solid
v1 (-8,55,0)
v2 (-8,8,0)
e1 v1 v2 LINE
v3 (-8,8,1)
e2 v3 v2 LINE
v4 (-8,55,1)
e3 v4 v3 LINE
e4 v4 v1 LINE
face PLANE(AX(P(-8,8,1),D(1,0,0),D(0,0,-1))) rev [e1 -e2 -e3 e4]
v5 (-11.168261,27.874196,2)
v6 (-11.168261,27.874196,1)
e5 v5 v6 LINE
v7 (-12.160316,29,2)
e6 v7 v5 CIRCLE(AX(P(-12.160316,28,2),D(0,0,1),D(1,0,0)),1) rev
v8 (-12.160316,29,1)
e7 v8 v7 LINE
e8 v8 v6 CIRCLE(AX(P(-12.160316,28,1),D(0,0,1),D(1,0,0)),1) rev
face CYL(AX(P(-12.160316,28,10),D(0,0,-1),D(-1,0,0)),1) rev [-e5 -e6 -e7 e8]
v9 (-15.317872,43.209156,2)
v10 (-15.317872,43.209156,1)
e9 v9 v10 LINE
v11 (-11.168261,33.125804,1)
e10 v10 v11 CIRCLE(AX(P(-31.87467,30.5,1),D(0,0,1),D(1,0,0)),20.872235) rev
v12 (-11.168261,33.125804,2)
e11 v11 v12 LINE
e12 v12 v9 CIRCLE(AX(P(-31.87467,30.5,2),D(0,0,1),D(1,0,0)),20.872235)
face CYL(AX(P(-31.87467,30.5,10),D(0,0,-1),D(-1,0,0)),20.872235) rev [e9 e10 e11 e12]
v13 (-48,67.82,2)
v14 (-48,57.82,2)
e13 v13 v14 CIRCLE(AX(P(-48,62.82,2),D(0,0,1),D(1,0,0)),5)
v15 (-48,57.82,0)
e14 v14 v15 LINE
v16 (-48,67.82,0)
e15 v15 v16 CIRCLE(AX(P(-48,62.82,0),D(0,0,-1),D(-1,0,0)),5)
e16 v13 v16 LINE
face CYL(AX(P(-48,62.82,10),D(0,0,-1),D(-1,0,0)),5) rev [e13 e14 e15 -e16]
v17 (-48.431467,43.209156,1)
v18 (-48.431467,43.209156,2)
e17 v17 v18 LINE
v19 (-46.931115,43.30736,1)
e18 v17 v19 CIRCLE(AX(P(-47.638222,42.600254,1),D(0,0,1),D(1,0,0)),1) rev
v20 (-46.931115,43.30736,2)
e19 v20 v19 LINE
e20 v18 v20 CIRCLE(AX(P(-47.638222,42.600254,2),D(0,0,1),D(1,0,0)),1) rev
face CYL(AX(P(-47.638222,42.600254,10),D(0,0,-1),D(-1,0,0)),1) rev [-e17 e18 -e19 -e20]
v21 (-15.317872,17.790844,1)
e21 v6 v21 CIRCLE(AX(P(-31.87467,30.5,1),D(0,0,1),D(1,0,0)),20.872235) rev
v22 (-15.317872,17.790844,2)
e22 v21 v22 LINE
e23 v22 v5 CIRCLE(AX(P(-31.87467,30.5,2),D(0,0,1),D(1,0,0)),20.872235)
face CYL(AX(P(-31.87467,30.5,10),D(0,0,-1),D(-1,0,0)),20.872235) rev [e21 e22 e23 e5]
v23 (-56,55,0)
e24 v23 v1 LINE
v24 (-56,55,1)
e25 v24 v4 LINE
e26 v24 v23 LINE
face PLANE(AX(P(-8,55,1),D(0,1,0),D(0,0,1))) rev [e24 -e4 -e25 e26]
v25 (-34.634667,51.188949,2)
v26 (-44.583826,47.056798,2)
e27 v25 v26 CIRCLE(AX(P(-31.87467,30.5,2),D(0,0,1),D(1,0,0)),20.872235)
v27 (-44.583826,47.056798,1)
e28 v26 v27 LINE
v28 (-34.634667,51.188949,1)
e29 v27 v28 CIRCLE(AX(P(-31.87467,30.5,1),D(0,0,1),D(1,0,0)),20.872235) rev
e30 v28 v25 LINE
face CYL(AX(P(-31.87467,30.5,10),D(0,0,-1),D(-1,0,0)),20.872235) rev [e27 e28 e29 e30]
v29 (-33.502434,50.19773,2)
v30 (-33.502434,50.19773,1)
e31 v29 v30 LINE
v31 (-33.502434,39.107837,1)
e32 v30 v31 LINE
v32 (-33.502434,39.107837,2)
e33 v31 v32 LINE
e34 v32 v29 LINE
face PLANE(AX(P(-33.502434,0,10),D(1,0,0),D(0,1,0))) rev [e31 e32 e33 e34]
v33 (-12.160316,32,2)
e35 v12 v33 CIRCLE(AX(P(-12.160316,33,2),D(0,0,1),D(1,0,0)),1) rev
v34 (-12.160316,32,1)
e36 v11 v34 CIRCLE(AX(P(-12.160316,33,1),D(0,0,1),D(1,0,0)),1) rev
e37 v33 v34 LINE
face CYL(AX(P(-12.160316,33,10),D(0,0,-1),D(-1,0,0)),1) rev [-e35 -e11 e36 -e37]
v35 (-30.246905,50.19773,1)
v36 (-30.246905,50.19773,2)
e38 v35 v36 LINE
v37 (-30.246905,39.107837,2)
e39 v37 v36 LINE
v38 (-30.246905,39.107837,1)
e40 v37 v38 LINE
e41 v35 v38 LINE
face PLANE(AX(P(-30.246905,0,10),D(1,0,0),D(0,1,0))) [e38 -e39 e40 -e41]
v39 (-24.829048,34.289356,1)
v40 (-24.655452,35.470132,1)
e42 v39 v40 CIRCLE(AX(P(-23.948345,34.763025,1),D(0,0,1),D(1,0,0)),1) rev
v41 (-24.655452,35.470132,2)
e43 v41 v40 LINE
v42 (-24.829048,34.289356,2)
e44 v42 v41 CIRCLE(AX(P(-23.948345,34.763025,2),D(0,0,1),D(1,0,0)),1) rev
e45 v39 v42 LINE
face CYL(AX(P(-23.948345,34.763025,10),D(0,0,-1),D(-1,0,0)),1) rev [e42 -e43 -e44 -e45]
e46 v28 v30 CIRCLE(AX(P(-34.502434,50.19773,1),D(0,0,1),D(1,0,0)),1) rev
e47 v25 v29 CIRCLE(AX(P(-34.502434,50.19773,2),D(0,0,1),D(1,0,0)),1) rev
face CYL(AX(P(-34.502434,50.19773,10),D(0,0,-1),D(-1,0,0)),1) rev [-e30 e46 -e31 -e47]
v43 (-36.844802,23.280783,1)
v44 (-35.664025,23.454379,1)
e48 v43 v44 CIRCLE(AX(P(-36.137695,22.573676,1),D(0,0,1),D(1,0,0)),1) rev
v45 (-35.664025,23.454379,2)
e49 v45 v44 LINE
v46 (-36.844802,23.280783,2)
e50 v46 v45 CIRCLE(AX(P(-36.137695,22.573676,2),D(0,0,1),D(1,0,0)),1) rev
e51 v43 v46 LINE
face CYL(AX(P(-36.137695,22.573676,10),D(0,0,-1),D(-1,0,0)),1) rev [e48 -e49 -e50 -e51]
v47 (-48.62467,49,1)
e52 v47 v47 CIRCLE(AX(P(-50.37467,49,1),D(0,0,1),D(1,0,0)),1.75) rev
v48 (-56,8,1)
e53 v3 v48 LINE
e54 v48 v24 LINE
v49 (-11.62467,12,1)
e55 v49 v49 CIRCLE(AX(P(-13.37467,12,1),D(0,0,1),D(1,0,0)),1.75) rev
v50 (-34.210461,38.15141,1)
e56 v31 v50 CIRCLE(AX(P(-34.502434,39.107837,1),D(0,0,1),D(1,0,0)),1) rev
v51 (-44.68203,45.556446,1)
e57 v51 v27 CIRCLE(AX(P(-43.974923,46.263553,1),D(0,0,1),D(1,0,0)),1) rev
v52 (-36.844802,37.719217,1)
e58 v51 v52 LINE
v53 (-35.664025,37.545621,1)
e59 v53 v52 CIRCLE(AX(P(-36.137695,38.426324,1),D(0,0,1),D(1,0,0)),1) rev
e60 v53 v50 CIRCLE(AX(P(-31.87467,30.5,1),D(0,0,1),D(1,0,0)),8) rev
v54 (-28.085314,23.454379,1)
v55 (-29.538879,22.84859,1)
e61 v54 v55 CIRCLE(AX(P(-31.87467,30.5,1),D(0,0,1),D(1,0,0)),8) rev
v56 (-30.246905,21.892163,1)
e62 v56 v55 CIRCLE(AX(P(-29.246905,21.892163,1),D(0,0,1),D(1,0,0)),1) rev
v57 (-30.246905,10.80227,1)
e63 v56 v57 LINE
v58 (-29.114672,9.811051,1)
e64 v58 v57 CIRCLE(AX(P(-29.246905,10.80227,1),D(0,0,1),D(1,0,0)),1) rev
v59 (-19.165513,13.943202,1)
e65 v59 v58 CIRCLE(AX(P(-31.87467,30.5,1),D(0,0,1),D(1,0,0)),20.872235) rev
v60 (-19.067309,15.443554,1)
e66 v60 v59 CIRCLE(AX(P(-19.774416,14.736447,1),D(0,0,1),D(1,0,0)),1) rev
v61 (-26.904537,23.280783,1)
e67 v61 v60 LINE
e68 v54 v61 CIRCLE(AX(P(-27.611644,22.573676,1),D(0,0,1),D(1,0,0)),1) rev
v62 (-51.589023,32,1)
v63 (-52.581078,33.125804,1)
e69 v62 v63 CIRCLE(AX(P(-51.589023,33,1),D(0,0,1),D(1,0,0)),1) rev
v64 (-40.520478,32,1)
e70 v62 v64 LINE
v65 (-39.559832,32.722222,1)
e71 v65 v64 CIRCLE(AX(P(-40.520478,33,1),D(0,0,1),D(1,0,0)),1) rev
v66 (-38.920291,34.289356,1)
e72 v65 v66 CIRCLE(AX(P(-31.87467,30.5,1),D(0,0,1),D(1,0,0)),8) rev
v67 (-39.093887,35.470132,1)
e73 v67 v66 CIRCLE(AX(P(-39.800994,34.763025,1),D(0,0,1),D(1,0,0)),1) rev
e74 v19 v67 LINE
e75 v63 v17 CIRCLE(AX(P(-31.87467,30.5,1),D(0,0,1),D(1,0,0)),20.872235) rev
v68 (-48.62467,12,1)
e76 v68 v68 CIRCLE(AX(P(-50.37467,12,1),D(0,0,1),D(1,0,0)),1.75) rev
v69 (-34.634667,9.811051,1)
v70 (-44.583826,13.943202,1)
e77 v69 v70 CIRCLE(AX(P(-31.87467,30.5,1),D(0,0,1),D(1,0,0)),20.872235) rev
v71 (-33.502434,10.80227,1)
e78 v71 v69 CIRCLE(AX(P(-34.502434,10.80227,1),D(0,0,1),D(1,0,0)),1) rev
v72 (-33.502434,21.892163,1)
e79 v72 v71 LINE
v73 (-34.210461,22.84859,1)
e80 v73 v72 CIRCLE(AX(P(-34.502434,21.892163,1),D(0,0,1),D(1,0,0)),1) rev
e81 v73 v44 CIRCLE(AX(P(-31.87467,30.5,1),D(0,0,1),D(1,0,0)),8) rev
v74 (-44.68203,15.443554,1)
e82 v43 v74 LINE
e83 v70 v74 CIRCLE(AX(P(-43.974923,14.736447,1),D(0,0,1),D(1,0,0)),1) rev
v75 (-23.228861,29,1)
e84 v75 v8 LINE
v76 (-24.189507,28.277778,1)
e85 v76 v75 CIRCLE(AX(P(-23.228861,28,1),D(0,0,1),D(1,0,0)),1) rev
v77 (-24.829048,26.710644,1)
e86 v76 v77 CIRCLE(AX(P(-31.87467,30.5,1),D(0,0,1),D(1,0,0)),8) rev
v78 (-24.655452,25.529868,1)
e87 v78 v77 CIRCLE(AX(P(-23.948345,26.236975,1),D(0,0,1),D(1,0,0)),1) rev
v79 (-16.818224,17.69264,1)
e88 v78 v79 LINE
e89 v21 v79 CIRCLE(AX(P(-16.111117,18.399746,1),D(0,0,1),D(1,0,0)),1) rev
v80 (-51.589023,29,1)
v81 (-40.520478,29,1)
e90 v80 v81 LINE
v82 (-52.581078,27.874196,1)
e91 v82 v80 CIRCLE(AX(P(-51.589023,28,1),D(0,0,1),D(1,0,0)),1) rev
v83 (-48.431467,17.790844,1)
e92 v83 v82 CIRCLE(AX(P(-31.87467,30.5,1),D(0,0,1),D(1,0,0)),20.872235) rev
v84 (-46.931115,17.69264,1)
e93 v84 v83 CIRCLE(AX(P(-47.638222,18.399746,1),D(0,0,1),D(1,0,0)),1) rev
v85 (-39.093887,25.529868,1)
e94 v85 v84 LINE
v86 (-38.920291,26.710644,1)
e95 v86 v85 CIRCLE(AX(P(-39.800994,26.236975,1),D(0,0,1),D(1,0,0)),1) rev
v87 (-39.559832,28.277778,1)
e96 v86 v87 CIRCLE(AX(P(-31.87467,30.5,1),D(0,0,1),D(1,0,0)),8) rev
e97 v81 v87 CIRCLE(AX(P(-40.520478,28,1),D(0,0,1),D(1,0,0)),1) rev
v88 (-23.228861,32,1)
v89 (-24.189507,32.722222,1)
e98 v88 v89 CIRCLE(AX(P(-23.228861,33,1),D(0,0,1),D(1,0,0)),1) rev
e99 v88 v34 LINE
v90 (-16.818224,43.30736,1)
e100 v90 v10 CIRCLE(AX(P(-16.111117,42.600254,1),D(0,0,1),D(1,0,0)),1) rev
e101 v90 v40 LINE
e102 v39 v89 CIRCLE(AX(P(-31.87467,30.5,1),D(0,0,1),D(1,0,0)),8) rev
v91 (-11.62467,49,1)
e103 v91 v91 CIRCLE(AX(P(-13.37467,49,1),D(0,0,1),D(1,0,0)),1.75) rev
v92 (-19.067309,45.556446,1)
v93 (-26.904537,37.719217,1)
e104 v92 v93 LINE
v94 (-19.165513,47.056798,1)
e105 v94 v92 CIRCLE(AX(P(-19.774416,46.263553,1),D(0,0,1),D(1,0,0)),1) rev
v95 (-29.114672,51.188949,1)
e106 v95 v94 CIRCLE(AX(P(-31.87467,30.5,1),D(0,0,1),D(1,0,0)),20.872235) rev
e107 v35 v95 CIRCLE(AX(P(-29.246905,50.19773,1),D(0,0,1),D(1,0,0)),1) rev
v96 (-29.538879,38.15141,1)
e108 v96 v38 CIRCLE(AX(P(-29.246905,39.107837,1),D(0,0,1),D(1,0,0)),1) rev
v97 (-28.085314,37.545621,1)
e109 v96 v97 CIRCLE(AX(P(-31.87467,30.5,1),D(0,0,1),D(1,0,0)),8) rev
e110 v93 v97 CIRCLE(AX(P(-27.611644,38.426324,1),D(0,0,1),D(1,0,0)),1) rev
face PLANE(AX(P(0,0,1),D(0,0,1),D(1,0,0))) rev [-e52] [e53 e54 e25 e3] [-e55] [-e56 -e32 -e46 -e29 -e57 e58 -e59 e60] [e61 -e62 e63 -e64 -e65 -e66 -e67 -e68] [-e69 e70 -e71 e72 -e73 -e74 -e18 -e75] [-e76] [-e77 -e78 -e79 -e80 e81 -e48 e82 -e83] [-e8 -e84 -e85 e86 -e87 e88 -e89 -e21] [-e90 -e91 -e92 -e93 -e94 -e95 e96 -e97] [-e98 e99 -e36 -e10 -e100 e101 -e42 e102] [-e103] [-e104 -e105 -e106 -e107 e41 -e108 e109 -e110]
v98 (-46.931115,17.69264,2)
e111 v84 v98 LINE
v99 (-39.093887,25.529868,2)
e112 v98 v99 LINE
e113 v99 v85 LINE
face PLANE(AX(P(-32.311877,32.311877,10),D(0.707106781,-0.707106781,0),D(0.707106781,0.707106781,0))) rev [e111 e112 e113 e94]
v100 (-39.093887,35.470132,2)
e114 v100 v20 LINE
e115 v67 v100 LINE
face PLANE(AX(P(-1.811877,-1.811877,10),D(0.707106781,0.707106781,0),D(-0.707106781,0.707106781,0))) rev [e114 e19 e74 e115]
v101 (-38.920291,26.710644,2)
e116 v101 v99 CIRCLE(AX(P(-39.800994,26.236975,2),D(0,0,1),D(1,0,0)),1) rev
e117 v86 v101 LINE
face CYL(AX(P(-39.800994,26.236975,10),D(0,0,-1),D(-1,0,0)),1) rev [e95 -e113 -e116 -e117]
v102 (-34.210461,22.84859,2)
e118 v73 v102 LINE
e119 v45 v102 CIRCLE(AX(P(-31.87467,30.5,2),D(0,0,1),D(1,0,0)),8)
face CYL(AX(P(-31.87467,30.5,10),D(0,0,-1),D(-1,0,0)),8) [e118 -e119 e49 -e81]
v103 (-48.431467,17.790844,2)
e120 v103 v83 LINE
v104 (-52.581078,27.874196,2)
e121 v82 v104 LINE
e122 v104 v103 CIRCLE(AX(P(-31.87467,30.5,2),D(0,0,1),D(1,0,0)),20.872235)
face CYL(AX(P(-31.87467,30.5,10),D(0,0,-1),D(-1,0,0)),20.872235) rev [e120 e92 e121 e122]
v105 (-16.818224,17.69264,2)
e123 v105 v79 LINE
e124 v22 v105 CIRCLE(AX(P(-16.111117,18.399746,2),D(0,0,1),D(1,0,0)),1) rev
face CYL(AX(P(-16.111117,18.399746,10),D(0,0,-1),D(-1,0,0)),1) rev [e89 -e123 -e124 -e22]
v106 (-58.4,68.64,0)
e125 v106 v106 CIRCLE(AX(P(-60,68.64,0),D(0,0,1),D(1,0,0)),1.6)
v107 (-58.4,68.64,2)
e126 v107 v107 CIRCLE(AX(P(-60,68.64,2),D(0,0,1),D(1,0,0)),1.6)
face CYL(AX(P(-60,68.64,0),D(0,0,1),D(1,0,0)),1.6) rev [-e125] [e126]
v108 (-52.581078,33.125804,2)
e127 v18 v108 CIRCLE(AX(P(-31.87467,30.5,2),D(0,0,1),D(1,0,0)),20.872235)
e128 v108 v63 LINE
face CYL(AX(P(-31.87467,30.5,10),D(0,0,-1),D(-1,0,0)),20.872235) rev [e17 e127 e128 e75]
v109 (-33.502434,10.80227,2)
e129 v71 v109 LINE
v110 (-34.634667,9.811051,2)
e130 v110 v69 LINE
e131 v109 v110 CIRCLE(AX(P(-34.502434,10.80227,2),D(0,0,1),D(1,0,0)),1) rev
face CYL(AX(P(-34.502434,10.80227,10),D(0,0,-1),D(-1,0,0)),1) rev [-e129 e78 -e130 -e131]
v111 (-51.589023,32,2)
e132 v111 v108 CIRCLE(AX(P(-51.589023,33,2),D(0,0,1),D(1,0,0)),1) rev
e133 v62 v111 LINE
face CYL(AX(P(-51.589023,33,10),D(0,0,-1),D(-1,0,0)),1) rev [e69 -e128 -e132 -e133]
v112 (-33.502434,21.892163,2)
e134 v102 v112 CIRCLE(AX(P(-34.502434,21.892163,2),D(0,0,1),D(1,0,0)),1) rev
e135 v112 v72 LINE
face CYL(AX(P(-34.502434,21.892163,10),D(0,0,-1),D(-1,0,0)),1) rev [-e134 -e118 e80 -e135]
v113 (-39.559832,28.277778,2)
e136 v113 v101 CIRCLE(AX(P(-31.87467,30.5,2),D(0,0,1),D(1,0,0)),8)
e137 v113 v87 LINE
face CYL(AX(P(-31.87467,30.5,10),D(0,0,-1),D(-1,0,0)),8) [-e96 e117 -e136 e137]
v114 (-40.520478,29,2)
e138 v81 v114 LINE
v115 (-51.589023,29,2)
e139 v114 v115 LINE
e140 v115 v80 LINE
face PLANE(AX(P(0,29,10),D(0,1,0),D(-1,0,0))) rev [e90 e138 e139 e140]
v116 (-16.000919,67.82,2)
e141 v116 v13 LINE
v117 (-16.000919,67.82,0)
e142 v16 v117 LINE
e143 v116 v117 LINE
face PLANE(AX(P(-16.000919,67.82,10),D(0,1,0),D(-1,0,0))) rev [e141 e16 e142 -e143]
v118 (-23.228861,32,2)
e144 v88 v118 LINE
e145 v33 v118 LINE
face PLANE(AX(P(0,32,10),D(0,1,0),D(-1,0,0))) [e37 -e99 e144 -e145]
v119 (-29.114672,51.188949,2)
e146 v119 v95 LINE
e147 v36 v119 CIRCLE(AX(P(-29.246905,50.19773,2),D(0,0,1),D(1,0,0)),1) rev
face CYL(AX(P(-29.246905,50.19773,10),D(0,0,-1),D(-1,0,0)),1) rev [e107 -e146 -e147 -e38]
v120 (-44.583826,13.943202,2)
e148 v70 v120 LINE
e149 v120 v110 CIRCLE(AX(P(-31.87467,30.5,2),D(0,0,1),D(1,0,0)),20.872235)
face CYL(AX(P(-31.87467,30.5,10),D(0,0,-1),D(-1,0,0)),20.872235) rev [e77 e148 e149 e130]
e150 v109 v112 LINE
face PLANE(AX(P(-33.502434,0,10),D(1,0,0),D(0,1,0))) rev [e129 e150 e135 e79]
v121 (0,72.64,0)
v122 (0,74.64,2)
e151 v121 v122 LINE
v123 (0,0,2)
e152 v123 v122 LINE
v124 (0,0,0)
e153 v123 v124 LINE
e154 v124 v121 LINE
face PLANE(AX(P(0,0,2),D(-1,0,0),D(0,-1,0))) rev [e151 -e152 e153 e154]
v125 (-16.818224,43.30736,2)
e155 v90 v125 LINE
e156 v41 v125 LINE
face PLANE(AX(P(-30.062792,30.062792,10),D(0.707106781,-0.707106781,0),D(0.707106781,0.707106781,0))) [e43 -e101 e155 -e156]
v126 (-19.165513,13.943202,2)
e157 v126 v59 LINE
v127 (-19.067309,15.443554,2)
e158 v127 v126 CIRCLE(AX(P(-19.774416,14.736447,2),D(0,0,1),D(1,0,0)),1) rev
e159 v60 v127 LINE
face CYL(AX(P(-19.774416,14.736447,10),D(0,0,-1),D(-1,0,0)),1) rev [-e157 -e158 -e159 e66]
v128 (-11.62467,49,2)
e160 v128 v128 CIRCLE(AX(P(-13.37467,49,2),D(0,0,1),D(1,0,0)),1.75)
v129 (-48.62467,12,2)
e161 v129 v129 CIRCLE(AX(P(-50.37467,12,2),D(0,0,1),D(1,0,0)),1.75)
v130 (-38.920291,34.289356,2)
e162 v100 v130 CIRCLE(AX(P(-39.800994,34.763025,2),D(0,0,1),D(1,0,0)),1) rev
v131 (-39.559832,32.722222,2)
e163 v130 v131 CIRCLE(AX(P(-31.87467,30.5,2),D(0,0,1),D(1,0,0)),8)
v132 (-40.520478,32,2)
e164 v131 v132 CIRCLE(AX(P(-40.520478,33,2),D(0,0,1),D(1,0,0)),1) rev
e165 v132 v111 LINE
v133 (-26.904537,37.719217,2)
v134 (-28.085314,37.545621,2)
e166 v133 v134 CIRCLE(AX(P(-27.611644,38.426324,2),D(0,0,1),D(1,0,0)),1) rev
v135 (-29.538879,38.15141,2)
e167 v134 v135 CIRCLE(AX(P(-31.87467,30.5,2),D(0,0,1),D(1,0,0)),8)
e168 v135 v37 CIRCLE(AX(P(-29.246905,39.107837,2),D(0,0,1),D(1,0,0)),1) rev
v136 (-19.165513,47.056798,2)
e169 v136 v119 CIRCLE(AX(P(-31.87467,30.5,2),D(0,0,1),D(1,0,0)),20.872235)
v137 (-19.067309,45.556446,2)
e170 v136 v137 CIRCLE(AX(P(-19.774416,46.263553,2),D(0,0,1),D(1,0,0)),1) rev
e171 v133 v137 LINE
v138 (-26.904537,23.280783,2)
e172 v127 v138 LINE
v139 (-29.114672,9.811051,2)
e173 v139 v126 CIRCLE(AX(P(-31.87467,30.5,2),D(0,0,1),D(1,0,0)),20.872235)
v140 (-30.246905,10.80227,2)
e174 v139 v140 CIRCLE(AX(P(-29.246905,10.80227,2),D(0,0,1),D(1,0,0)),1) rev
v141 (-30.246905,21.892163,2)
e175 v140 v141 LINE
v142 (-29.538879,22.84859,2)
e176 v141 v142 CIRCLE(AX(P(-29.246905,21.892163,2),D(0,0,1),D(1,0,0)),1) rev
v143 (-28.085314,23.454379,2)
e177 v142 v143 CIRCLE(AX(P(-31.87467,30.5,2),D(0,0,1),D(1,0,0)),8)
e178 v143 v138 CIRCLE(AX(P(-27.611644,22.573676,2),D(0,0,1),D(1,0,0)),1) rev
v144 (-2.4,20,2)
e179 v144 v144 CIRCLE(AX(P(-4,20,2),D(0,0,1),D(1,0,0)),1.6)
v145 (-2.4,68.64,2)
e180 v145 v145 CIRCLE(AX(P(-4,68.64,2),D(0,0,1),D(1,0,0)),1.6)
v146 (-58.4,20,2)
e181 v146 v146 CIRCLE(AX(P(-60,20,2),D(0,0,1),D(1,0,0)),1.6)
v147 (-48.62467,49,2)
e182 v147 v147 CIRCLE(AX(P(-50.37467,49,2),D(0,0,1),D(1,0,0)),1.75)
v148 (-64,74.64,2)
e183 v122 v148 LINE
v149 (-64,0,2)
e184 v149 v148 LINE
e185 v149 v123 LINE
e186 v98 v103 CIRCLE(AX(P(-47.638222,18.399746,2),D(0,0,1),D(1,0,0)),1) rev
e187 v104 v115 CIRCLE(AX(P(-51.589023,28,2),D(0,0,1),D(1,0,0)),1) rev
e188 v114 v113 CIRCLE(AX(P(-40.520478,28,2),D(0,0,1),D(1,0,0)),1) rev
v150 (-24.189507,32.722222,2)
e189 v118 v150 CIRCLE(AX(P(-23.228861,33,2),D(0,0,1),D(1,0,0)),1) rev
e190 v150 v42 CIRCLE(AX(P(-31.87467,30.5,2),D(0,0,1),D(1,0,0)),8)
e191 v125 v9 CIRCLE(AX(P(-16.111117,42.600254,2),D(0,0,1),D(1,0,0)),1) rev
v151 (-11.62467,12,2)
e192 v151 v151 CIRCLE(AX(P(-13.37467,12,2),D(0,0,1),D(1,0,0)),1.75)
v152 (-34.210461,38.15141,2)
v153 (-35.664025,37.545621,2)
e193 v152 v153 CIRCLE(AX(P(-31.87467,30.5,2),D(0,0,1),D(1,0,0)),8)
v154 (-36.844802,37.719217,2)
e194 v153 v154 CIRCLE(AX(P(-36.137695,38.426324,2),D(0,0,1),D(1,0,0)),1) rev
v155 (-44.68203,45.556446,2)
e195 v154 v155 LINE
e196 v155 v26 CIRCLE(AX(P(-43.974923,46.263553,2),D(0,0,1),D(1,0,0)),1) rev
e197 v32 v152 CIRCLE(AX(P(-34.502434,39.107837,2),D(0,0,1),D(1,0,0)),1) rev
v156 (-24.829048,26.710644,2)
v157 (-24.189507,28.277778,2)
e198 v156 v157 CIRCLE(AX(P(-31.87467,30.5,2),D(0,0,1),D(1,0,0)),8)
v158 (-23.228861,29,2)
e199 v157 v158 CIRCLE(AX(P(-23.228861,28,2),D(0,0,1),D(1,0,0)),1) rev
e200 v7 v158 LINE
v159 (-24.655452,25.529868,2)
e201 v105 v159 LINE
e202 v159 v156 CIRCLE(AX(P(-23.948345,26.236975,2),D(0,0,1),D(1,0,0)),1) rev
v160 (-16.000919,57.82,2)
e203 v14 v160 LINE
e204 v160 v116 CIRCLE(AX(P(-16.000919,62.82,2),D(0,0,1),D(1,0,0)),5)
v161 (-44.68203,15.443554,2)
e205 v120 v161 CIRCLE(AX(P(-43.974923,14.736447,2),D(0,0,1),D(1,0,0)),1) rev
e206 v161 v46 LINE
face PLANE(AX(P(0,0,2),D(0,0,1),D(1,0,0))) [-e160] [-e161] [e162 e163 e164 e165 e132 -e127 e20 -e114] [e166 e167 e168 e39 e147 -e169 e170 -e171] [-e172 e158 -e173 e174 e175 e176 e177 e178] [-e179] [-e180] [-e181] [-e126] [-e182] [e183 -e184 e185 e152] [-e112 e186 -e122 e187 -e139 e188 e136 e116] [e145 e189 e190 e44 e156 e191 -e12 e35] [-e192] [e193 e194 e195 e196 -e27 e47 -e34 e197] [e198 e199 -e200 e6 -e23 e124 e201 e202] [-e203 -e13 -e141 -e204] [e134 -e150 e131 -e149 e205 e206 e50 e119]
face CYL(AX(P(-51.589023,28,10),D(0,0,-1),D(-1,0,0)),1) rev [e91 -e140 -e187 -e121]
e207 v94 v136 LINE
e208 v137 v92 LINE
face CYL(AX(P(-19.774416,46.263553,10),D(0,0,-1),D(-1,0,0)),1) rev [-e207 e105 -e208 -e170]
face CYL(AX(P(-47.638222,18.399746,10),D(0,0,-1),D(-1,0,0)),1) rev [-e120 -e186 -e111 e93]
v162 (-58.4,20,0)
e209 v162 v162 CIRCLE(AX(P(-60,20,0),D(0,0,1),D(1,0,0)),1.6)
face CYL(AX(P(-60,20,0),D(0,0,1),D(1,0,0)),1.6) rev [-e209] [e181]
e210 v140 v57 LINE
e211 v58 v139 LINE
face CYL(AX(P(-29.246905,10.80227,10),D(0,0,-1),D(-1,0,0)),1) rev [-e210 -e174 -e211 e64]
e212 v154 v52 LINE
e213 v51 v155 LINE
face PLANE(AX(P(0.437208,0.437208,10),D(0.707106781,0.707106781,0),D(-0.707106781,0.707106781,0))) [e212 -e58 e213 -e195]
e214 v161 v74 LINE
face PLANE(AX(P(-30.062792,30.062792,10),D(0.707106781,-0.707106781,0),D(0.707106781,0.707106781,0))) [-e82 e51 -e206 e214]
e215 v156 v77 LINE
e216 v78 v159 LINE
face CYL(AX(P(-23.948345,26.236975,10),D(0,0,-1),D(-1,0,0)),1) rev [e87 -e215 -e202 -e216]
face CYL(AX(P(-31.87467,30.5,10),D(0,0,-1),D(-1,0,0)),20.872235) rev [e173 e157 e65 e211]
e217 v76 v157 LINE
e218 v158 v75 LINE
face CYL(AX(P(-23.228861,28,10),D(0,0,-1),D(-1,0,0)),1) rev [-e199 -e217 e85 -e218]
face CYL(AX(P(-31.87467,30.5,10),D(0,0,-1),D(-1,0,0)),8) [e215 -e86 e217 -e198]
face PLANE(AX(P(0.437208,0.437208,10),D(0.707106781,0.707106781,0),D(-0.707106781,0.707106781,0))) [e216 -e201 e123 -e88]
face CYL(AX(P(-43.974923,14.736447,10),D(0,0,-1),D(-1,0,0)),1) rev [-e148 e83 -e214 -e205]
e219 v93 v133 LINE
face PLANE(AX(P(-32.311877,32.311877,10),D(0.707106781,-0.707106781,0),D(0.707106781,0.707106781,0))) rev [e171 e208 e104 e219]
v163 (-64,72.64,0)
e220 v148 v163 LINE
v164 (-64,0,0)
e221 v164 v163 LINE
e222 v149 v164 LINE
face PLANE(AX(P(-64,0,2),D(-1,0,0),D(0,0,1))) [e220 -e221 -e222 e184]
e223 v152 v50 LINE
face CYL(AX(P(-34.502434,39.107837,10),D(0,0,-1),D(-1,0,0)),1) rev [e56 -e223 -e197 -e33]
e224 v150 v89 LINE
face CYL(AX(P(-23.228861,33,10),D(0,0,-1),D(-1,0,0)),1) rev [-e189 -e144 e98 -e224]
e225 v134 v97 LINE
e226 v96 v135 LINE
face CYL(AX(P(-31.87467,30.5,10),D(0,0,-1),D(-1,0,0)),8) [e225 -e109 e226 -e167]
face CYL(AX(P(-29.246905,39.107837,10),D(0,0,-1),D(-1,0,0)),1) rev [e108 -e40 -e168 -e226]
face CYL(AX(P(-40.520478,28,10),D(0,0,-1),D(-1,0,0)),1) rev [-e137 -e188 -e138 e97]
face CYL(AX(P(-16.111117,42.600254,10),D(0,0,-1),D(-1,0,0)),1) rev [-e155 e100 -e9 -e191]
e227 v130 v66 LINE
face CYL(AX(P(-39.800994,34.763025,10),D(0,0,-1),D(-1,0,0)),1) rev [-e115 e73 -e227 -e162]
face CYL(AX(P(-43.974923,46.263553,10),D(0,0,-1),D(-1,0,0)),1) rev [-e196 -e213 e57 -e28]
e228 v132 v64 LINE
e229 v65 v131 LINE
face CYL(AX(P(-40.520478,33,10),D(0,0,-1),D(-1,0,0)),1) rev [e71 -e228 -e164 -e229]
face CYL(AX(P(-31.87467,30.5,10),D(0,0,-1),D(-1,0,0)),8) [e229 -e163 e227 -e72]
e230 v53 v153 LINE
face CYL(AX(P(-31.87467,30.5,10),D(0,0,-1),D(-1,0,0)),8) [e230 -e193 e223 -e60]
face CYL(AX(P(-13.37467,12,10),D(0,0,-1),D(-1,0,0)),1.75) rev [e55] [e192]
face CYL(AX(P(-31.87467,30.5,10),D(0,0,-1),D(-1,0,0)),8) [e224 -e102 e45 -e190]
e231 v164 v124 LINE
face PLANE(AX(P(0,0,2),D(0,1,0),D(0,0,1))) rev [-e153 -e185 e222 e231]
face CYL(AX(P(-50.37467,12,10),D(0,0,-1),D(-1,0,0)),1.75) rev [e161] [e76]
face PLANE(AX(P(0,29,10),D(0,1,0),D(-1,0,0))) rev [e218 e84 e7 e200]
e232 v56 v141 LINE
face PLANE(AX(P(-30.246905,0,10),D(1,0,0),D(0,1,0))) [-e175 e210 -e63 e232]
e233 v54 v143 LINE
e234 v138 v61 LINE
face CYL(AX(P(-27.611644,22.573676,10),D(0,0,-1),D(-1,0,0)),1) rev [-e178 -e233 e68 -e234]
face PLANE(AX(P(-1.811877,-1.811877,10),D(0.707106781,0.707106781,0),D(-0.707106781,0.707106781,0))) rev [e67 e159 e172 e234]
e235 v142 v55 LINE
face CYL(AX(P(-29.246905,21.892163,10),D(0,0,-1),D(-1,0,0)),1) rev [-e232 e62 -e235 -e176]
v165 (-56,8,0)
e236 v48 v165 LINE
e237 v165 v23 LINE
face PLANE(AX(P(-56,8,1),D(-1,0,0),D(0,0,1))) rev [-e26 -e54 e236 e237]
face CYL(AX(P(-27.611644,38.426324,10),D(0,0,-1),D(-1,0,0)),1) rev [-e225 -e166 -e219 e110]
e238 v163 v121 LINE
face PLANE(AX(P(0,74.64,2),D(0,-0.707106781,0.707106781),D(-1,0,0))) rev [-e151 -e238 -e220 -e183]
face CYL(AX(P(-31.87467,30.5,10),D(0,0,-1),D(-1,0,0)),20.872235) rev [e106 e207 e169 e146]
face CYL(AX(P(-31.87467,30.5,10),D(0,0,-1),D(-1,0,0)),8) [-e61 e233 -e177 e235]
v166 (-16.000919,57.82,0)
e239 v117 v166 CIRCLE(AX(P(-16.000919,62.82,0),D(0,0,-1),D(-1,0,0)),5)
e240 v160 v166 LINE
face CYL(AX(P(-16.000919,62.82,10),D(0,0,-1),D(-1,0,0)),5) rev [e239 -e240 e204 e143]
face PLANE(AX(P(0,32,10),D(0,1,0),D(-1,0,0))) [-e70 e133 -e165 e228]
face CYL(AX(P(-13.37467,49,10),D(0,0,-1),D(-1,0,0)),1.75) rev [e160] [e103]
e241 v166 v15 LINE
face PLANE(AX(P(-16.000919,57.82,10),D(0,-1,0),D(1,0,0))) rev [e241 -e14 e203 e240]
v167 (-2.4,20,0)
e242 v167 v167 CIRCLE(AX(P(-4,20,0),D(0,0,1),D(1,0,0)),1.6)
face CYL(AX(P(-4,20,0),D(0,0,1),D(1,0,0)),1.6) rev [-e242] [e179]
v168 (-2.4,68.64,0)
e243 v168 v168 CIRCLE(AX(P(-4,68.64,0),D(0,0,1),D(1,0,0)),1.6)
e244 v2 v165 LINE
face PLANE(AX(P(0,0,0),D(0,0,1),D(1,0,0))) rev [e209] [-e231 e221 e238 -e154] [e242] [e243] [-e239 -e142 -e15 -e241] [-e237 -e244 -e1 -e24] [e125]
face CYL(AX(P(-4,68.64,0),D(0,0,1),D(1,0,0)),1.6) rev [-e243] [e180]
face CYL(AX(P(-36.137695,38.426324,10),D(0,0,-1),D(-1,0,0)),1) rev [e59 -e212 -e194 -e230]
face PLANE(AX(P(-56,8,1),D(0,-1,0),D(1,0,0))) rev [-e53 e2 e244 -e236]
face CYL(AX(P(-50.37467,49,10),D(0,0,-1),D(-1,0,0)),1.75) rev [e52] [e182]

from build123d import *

# Parameters (mm, degrees)
SZKIC1_W                    = 64
SZKIC1_H                    = 2
SZKIC1_H_2                  = 72.64
DODANIE_WYCI_GNI_CIE1_DEPTH = 2
SFAZOWANIE1_SIZE            = 2
SZKIC2_R                    = 1.6
WYTNIJ_WYCI_GNI_CIE1_DEPTH  = 2
WYTNIJ_WYCI_GNI_CIE2_DEPTH  = 10
ZAOKR_GLENIE1_R             = 1
SZKIC4_R                    = 1.75
WYTNIJ_WYCI_GNI_CIE3_DEPTH  = 10
WYTNIJ_WYCI_GNI_CIE4_DEPTH  = 10
SZKIC6_W                    = 48
SZKIC6_H                    = 47
WYTNIJ_WYCI_GNI_CIE5_DEPTH  = 1


with BuildPart() as part:
    # Szkic1 → Dodanie-wyciągnięcie1 (new body)
    with BuildSketch(Plane.XY):
        with Locations((-32, 73.64)):
            Rectangle(SZKIC1_W, SZKIC1_H)
        with Locations((-32, 36.32)):
            Rectangle(SZKIC1_W, SZKIC1_H_2)
    extrude(amount=DODANIE_WYCI_GNI_CIE1_DEPTH)

    # Sfazowanie1
    sfazowanie1_edges = [part.edges().sort_by_distance(p)[0] for p in [
        (-32, 74.64, 0),
    ]]
    chamfer(sfazowanie1_edges, length=SFAZOWANIE1_SIZE - 0.0001)  # a hair under: the kernel refuses the full size

    # Szkic2 → Wytnij-wyciągnięcie1 (cut)
    with BuildSketch(Plane.XY.offset(2)):
        with Locations((-60, 20)):
            Circle(SZKIC2_R)
        with Locations((-4, 20)):
            Circle(SZKIC2_R)
        with Locations((-4, 68.64)):
            Circle(SZKIC2_R)
        with Locations((-60, 68.64)):
            Circle(SZKIC2_R)
    extrude(amount=-WYTNIJ_WYCI_GNI_CIE1_DEPTH, mode=Mode.SUBTRACT)

    # Szkic3 → Wytnij-wyciągnięcie2 (cut)
    with BuildSketch(Plane(origin=(0, 0, 0), x_dir=(-1, 0, 0), z_dir=(0, 0, -1))):
        with BuildLine():
            Line((11.056403618, 32), (24.016552746, 32))
            ThreePointArc((24.016552746, 32), (24.466137465, 33.518882587), (25.206174928, 34.919409376))
            Line((25.206174928, 34.919409376), (16.034132153, 44.091452151))
            ThreePointArc((16.034132153, 44.091452151), (12.573950156, 38.445591693), (11.056403618, 32))
        make_face()
        with BuildLine():
            ThreePointArc((25.206174928, 26.080590624), (24.466137465, 27.481117413), (24.016552746, 29))
            Line((24.016552746, 29), (11.056403618, 29))
            ThreePointArc((11.056403618, 29), (12.573950156, 22.554408307), (16.034132153, 16.908547849))
            Line((16.034132153, 16.908547849), (25.206174928, 26.080590624))
        make_face()
        with BuildLine():
            ThreePointArc((27.455260193, 37.168494641), (28.795563732, 37.883705523), (30.246904647, 38.332648426))
            Line((30.246904647, 38.332648426), (30.246904647, 51.308665948))
            ThreePointArc((30.246904647, 51.308665948), (23.86987617, 49.77624133), (18.283217418, 46.340537416))
            Line((18.283217418, 46.340537416), (27.455260193, 37.168494641))
        make_face()
        with BuildLine():
            ThreePointArc((33.50243449, 38.332648426), (34.953775405, 37.883705523), (36.294078944, 37.168494641))
            Line((36.294078944, 37.168494641), (45.466121719, 46.340537416))
            ThreePointArc((45.466121719, 46.340537416), (39.879462967, 49.77624133), (33.50243449, 51.308665948))
            Line((33.50243449, 51.308665948), (33.50243449, 38.332648426))
        make_face()
        with BuildLine():
            ThreePointArc((38.543164209, 34.919409376), (39.283201672, 33.518882587), (39.732786391, 32))
            Line((39.732786391, 32), (52.692935519, 32))
            ThreePointArc((52.692935519, 32), (51.175388981, 38.445591693), (47.715206984, 44.091452151))
            Line((47.715206984, 44.091452151), (38.543164209, 34.919409376))
        make_face()
        with BuildLine():
            Line((52.692935519, 29), (39.732786391, 29))
            ThreePointArc((39.732786391, 29), (39.283201672, 27.481117413), (38.543164209, 26.080590624))
            Line((38.543164209, 26.080590624), (47.715206984, 16.908547849))
            ThreePointArc((47.715206984, 16.908547849), (51.175388981, 22.554408307), (52.692935519, 29))
        make_face()
        with BuildLine():
            Line((45.466121719, 14.659462584), (36.294078944, 23.831505359))
            ThreePointArc((36.294078944, 23.831505359), (34.953775405, 23.116294477), (33.50243449, 22.667351574))
            Line((33.50243449, 22.667351574), (33.50243449, 9.691334052))
            ThreePointArc((33.50243449, 9.691334052), (39.879462967, 11.22375867), (45.466121719, 14.659462584))
        make_face()
        with BuildLine():
            Line((30.246904647, 9.691334052), (30.246904647, 22.667351574))
            ThreePointArc((30.246904647, 22.667351574), (28.795563732, 23.116294477), (27.455260193, 23.831505359))
            Line((27.455260193, 23.831505359), (18.283217418, 14.659462584))
            ThreePointArc((18.283217418, 14.659462584), (23.86987617, 11.22375867), (30.246904647, 9.691334052))
        make_face()
    extrude(amount=-WYTNIJ_WYCI_GNI_CIE2_DEPTH, mode=Mode.SUBTRACT)

    # Zaokrąglenie1
    zaokr_glenie1_edges = [part.edges().sort_by_distance(p)[0] for p in [
        (-36.294078944, 37.168494641, 1),
        (-33.50243449, 38.332648426, 1),
        (-33.50243449, 51.308665948, 1),
        (-45.466121719, 46.340537416, 1),
        (-33.50243449, 22.667351574, 1),
        (-36.294078944, 23.831505359, 1),
        (-45.466121719, 14.659462584, 1),
        (-33.50243449, 9.691334052, 1),
        (-38.543164209, 26.080590624, 1),
        (-39.732786391, 29, 1),
        (-52.692935519, 29, 1),
        (-47.715206984, 16.908547849, 1),
        (-27.455260193, 23.831505359, 1),
        (-30.246904647, 22.667351574, 1),
        (-30.246904647, 9.691334052, 1),
        (-18.283217418, 14.659462584, 1),
        (-25.206174928, 34.919409376, 1),
        (-24.016552746, 32, 1),
        (-11.056403618, 32, 1),
        (-16.034132153, 44.091452151, 1),
        (-24.016552746, 29, 1),
        (-25.206174928, 26.080590624, 1),
        (-16.034132153, 16.908547849, 1),
        (-11.056403618, 29, 1),
        (-30.246904647, 38.332648426, 1),
        (-27.455260193, 37.168494641, 1),
        (-18.283217418, 46.340537416, 1),
        (-30.246904647, 51.308665948, 1),
        (-39.732786391, 32, 1),
        (-38.543164209, 34.919409376, 1),
        (-47.715206984, 44.091452151, 1),
        (-52.692935519, 32, 1),
    ]]
    fillet(zaokr_glenie1_edges, radius=ZAOKR_GLENIE1_R)

    # Szkic4 → Wytnij-wyciągnięcie3 (cut)
    with BuildSketch(Plane(origin=(0, 0, 0), x_dir=(-1, 0, 0), z_dir=(0, 0, -1))):
        with Locations((13.374669569, 49)):
            Circle(SZKIC4_R)
        with Locations((50.374669569, 49)):
            Circle(SZKIC4_R)
        with Locations((50.374669569, 12)):
            Circle(SZKIC4_R)
        with Locations((13.374669569, 12)):
            Circle(SZKIC4_R)
    extrude(amount=-WYTNIJ_WYCI_GNI_CIE3_DEPTH, mode=Mode.SUBTRACT)

    # Szkic5 → Wytnij-wyciągnięcie4 (cut)
    with BuildSketch(Plane(origin=(0, 0, 0), x_dir=(-1, 0, 0), z_dir=(0, 0, -1))):
        with BuildLine():
            Line((16.000918864, 67.82), (48, 67.82))
            ThreePointArc((48, 67.82), (53, 62.82), (48, 57.82))
            Line((48, 57.82), (16.000918864, 57.82))
            ThreePointArc((16.000918864, 57.82), (11.000918864, 62.82), (16.000918864, 67.82))
        make_face()
    extrude(amount=-WYTNIJ_WYCI_GNI_CIE4_DEPTH, mode=Mode.SUBTRACT)

    # Szkic6 → Wytnij-wyciągnięcie5 (cut)
    with BuildSketch(Plane(origin=(0, 0, 0), x_dir=(-1, 0, 0), z_dir=(0, 0, -1))):
        with Locations((32, 31.5)):
            Rectangle(SZKIC6_W, SZKIC6_H)
    extrude(amount=-WYTNIJ_WYCI_GNI_CIE5_DEPTH, mode=Mode.SUBTRACT)


solid = part.part
